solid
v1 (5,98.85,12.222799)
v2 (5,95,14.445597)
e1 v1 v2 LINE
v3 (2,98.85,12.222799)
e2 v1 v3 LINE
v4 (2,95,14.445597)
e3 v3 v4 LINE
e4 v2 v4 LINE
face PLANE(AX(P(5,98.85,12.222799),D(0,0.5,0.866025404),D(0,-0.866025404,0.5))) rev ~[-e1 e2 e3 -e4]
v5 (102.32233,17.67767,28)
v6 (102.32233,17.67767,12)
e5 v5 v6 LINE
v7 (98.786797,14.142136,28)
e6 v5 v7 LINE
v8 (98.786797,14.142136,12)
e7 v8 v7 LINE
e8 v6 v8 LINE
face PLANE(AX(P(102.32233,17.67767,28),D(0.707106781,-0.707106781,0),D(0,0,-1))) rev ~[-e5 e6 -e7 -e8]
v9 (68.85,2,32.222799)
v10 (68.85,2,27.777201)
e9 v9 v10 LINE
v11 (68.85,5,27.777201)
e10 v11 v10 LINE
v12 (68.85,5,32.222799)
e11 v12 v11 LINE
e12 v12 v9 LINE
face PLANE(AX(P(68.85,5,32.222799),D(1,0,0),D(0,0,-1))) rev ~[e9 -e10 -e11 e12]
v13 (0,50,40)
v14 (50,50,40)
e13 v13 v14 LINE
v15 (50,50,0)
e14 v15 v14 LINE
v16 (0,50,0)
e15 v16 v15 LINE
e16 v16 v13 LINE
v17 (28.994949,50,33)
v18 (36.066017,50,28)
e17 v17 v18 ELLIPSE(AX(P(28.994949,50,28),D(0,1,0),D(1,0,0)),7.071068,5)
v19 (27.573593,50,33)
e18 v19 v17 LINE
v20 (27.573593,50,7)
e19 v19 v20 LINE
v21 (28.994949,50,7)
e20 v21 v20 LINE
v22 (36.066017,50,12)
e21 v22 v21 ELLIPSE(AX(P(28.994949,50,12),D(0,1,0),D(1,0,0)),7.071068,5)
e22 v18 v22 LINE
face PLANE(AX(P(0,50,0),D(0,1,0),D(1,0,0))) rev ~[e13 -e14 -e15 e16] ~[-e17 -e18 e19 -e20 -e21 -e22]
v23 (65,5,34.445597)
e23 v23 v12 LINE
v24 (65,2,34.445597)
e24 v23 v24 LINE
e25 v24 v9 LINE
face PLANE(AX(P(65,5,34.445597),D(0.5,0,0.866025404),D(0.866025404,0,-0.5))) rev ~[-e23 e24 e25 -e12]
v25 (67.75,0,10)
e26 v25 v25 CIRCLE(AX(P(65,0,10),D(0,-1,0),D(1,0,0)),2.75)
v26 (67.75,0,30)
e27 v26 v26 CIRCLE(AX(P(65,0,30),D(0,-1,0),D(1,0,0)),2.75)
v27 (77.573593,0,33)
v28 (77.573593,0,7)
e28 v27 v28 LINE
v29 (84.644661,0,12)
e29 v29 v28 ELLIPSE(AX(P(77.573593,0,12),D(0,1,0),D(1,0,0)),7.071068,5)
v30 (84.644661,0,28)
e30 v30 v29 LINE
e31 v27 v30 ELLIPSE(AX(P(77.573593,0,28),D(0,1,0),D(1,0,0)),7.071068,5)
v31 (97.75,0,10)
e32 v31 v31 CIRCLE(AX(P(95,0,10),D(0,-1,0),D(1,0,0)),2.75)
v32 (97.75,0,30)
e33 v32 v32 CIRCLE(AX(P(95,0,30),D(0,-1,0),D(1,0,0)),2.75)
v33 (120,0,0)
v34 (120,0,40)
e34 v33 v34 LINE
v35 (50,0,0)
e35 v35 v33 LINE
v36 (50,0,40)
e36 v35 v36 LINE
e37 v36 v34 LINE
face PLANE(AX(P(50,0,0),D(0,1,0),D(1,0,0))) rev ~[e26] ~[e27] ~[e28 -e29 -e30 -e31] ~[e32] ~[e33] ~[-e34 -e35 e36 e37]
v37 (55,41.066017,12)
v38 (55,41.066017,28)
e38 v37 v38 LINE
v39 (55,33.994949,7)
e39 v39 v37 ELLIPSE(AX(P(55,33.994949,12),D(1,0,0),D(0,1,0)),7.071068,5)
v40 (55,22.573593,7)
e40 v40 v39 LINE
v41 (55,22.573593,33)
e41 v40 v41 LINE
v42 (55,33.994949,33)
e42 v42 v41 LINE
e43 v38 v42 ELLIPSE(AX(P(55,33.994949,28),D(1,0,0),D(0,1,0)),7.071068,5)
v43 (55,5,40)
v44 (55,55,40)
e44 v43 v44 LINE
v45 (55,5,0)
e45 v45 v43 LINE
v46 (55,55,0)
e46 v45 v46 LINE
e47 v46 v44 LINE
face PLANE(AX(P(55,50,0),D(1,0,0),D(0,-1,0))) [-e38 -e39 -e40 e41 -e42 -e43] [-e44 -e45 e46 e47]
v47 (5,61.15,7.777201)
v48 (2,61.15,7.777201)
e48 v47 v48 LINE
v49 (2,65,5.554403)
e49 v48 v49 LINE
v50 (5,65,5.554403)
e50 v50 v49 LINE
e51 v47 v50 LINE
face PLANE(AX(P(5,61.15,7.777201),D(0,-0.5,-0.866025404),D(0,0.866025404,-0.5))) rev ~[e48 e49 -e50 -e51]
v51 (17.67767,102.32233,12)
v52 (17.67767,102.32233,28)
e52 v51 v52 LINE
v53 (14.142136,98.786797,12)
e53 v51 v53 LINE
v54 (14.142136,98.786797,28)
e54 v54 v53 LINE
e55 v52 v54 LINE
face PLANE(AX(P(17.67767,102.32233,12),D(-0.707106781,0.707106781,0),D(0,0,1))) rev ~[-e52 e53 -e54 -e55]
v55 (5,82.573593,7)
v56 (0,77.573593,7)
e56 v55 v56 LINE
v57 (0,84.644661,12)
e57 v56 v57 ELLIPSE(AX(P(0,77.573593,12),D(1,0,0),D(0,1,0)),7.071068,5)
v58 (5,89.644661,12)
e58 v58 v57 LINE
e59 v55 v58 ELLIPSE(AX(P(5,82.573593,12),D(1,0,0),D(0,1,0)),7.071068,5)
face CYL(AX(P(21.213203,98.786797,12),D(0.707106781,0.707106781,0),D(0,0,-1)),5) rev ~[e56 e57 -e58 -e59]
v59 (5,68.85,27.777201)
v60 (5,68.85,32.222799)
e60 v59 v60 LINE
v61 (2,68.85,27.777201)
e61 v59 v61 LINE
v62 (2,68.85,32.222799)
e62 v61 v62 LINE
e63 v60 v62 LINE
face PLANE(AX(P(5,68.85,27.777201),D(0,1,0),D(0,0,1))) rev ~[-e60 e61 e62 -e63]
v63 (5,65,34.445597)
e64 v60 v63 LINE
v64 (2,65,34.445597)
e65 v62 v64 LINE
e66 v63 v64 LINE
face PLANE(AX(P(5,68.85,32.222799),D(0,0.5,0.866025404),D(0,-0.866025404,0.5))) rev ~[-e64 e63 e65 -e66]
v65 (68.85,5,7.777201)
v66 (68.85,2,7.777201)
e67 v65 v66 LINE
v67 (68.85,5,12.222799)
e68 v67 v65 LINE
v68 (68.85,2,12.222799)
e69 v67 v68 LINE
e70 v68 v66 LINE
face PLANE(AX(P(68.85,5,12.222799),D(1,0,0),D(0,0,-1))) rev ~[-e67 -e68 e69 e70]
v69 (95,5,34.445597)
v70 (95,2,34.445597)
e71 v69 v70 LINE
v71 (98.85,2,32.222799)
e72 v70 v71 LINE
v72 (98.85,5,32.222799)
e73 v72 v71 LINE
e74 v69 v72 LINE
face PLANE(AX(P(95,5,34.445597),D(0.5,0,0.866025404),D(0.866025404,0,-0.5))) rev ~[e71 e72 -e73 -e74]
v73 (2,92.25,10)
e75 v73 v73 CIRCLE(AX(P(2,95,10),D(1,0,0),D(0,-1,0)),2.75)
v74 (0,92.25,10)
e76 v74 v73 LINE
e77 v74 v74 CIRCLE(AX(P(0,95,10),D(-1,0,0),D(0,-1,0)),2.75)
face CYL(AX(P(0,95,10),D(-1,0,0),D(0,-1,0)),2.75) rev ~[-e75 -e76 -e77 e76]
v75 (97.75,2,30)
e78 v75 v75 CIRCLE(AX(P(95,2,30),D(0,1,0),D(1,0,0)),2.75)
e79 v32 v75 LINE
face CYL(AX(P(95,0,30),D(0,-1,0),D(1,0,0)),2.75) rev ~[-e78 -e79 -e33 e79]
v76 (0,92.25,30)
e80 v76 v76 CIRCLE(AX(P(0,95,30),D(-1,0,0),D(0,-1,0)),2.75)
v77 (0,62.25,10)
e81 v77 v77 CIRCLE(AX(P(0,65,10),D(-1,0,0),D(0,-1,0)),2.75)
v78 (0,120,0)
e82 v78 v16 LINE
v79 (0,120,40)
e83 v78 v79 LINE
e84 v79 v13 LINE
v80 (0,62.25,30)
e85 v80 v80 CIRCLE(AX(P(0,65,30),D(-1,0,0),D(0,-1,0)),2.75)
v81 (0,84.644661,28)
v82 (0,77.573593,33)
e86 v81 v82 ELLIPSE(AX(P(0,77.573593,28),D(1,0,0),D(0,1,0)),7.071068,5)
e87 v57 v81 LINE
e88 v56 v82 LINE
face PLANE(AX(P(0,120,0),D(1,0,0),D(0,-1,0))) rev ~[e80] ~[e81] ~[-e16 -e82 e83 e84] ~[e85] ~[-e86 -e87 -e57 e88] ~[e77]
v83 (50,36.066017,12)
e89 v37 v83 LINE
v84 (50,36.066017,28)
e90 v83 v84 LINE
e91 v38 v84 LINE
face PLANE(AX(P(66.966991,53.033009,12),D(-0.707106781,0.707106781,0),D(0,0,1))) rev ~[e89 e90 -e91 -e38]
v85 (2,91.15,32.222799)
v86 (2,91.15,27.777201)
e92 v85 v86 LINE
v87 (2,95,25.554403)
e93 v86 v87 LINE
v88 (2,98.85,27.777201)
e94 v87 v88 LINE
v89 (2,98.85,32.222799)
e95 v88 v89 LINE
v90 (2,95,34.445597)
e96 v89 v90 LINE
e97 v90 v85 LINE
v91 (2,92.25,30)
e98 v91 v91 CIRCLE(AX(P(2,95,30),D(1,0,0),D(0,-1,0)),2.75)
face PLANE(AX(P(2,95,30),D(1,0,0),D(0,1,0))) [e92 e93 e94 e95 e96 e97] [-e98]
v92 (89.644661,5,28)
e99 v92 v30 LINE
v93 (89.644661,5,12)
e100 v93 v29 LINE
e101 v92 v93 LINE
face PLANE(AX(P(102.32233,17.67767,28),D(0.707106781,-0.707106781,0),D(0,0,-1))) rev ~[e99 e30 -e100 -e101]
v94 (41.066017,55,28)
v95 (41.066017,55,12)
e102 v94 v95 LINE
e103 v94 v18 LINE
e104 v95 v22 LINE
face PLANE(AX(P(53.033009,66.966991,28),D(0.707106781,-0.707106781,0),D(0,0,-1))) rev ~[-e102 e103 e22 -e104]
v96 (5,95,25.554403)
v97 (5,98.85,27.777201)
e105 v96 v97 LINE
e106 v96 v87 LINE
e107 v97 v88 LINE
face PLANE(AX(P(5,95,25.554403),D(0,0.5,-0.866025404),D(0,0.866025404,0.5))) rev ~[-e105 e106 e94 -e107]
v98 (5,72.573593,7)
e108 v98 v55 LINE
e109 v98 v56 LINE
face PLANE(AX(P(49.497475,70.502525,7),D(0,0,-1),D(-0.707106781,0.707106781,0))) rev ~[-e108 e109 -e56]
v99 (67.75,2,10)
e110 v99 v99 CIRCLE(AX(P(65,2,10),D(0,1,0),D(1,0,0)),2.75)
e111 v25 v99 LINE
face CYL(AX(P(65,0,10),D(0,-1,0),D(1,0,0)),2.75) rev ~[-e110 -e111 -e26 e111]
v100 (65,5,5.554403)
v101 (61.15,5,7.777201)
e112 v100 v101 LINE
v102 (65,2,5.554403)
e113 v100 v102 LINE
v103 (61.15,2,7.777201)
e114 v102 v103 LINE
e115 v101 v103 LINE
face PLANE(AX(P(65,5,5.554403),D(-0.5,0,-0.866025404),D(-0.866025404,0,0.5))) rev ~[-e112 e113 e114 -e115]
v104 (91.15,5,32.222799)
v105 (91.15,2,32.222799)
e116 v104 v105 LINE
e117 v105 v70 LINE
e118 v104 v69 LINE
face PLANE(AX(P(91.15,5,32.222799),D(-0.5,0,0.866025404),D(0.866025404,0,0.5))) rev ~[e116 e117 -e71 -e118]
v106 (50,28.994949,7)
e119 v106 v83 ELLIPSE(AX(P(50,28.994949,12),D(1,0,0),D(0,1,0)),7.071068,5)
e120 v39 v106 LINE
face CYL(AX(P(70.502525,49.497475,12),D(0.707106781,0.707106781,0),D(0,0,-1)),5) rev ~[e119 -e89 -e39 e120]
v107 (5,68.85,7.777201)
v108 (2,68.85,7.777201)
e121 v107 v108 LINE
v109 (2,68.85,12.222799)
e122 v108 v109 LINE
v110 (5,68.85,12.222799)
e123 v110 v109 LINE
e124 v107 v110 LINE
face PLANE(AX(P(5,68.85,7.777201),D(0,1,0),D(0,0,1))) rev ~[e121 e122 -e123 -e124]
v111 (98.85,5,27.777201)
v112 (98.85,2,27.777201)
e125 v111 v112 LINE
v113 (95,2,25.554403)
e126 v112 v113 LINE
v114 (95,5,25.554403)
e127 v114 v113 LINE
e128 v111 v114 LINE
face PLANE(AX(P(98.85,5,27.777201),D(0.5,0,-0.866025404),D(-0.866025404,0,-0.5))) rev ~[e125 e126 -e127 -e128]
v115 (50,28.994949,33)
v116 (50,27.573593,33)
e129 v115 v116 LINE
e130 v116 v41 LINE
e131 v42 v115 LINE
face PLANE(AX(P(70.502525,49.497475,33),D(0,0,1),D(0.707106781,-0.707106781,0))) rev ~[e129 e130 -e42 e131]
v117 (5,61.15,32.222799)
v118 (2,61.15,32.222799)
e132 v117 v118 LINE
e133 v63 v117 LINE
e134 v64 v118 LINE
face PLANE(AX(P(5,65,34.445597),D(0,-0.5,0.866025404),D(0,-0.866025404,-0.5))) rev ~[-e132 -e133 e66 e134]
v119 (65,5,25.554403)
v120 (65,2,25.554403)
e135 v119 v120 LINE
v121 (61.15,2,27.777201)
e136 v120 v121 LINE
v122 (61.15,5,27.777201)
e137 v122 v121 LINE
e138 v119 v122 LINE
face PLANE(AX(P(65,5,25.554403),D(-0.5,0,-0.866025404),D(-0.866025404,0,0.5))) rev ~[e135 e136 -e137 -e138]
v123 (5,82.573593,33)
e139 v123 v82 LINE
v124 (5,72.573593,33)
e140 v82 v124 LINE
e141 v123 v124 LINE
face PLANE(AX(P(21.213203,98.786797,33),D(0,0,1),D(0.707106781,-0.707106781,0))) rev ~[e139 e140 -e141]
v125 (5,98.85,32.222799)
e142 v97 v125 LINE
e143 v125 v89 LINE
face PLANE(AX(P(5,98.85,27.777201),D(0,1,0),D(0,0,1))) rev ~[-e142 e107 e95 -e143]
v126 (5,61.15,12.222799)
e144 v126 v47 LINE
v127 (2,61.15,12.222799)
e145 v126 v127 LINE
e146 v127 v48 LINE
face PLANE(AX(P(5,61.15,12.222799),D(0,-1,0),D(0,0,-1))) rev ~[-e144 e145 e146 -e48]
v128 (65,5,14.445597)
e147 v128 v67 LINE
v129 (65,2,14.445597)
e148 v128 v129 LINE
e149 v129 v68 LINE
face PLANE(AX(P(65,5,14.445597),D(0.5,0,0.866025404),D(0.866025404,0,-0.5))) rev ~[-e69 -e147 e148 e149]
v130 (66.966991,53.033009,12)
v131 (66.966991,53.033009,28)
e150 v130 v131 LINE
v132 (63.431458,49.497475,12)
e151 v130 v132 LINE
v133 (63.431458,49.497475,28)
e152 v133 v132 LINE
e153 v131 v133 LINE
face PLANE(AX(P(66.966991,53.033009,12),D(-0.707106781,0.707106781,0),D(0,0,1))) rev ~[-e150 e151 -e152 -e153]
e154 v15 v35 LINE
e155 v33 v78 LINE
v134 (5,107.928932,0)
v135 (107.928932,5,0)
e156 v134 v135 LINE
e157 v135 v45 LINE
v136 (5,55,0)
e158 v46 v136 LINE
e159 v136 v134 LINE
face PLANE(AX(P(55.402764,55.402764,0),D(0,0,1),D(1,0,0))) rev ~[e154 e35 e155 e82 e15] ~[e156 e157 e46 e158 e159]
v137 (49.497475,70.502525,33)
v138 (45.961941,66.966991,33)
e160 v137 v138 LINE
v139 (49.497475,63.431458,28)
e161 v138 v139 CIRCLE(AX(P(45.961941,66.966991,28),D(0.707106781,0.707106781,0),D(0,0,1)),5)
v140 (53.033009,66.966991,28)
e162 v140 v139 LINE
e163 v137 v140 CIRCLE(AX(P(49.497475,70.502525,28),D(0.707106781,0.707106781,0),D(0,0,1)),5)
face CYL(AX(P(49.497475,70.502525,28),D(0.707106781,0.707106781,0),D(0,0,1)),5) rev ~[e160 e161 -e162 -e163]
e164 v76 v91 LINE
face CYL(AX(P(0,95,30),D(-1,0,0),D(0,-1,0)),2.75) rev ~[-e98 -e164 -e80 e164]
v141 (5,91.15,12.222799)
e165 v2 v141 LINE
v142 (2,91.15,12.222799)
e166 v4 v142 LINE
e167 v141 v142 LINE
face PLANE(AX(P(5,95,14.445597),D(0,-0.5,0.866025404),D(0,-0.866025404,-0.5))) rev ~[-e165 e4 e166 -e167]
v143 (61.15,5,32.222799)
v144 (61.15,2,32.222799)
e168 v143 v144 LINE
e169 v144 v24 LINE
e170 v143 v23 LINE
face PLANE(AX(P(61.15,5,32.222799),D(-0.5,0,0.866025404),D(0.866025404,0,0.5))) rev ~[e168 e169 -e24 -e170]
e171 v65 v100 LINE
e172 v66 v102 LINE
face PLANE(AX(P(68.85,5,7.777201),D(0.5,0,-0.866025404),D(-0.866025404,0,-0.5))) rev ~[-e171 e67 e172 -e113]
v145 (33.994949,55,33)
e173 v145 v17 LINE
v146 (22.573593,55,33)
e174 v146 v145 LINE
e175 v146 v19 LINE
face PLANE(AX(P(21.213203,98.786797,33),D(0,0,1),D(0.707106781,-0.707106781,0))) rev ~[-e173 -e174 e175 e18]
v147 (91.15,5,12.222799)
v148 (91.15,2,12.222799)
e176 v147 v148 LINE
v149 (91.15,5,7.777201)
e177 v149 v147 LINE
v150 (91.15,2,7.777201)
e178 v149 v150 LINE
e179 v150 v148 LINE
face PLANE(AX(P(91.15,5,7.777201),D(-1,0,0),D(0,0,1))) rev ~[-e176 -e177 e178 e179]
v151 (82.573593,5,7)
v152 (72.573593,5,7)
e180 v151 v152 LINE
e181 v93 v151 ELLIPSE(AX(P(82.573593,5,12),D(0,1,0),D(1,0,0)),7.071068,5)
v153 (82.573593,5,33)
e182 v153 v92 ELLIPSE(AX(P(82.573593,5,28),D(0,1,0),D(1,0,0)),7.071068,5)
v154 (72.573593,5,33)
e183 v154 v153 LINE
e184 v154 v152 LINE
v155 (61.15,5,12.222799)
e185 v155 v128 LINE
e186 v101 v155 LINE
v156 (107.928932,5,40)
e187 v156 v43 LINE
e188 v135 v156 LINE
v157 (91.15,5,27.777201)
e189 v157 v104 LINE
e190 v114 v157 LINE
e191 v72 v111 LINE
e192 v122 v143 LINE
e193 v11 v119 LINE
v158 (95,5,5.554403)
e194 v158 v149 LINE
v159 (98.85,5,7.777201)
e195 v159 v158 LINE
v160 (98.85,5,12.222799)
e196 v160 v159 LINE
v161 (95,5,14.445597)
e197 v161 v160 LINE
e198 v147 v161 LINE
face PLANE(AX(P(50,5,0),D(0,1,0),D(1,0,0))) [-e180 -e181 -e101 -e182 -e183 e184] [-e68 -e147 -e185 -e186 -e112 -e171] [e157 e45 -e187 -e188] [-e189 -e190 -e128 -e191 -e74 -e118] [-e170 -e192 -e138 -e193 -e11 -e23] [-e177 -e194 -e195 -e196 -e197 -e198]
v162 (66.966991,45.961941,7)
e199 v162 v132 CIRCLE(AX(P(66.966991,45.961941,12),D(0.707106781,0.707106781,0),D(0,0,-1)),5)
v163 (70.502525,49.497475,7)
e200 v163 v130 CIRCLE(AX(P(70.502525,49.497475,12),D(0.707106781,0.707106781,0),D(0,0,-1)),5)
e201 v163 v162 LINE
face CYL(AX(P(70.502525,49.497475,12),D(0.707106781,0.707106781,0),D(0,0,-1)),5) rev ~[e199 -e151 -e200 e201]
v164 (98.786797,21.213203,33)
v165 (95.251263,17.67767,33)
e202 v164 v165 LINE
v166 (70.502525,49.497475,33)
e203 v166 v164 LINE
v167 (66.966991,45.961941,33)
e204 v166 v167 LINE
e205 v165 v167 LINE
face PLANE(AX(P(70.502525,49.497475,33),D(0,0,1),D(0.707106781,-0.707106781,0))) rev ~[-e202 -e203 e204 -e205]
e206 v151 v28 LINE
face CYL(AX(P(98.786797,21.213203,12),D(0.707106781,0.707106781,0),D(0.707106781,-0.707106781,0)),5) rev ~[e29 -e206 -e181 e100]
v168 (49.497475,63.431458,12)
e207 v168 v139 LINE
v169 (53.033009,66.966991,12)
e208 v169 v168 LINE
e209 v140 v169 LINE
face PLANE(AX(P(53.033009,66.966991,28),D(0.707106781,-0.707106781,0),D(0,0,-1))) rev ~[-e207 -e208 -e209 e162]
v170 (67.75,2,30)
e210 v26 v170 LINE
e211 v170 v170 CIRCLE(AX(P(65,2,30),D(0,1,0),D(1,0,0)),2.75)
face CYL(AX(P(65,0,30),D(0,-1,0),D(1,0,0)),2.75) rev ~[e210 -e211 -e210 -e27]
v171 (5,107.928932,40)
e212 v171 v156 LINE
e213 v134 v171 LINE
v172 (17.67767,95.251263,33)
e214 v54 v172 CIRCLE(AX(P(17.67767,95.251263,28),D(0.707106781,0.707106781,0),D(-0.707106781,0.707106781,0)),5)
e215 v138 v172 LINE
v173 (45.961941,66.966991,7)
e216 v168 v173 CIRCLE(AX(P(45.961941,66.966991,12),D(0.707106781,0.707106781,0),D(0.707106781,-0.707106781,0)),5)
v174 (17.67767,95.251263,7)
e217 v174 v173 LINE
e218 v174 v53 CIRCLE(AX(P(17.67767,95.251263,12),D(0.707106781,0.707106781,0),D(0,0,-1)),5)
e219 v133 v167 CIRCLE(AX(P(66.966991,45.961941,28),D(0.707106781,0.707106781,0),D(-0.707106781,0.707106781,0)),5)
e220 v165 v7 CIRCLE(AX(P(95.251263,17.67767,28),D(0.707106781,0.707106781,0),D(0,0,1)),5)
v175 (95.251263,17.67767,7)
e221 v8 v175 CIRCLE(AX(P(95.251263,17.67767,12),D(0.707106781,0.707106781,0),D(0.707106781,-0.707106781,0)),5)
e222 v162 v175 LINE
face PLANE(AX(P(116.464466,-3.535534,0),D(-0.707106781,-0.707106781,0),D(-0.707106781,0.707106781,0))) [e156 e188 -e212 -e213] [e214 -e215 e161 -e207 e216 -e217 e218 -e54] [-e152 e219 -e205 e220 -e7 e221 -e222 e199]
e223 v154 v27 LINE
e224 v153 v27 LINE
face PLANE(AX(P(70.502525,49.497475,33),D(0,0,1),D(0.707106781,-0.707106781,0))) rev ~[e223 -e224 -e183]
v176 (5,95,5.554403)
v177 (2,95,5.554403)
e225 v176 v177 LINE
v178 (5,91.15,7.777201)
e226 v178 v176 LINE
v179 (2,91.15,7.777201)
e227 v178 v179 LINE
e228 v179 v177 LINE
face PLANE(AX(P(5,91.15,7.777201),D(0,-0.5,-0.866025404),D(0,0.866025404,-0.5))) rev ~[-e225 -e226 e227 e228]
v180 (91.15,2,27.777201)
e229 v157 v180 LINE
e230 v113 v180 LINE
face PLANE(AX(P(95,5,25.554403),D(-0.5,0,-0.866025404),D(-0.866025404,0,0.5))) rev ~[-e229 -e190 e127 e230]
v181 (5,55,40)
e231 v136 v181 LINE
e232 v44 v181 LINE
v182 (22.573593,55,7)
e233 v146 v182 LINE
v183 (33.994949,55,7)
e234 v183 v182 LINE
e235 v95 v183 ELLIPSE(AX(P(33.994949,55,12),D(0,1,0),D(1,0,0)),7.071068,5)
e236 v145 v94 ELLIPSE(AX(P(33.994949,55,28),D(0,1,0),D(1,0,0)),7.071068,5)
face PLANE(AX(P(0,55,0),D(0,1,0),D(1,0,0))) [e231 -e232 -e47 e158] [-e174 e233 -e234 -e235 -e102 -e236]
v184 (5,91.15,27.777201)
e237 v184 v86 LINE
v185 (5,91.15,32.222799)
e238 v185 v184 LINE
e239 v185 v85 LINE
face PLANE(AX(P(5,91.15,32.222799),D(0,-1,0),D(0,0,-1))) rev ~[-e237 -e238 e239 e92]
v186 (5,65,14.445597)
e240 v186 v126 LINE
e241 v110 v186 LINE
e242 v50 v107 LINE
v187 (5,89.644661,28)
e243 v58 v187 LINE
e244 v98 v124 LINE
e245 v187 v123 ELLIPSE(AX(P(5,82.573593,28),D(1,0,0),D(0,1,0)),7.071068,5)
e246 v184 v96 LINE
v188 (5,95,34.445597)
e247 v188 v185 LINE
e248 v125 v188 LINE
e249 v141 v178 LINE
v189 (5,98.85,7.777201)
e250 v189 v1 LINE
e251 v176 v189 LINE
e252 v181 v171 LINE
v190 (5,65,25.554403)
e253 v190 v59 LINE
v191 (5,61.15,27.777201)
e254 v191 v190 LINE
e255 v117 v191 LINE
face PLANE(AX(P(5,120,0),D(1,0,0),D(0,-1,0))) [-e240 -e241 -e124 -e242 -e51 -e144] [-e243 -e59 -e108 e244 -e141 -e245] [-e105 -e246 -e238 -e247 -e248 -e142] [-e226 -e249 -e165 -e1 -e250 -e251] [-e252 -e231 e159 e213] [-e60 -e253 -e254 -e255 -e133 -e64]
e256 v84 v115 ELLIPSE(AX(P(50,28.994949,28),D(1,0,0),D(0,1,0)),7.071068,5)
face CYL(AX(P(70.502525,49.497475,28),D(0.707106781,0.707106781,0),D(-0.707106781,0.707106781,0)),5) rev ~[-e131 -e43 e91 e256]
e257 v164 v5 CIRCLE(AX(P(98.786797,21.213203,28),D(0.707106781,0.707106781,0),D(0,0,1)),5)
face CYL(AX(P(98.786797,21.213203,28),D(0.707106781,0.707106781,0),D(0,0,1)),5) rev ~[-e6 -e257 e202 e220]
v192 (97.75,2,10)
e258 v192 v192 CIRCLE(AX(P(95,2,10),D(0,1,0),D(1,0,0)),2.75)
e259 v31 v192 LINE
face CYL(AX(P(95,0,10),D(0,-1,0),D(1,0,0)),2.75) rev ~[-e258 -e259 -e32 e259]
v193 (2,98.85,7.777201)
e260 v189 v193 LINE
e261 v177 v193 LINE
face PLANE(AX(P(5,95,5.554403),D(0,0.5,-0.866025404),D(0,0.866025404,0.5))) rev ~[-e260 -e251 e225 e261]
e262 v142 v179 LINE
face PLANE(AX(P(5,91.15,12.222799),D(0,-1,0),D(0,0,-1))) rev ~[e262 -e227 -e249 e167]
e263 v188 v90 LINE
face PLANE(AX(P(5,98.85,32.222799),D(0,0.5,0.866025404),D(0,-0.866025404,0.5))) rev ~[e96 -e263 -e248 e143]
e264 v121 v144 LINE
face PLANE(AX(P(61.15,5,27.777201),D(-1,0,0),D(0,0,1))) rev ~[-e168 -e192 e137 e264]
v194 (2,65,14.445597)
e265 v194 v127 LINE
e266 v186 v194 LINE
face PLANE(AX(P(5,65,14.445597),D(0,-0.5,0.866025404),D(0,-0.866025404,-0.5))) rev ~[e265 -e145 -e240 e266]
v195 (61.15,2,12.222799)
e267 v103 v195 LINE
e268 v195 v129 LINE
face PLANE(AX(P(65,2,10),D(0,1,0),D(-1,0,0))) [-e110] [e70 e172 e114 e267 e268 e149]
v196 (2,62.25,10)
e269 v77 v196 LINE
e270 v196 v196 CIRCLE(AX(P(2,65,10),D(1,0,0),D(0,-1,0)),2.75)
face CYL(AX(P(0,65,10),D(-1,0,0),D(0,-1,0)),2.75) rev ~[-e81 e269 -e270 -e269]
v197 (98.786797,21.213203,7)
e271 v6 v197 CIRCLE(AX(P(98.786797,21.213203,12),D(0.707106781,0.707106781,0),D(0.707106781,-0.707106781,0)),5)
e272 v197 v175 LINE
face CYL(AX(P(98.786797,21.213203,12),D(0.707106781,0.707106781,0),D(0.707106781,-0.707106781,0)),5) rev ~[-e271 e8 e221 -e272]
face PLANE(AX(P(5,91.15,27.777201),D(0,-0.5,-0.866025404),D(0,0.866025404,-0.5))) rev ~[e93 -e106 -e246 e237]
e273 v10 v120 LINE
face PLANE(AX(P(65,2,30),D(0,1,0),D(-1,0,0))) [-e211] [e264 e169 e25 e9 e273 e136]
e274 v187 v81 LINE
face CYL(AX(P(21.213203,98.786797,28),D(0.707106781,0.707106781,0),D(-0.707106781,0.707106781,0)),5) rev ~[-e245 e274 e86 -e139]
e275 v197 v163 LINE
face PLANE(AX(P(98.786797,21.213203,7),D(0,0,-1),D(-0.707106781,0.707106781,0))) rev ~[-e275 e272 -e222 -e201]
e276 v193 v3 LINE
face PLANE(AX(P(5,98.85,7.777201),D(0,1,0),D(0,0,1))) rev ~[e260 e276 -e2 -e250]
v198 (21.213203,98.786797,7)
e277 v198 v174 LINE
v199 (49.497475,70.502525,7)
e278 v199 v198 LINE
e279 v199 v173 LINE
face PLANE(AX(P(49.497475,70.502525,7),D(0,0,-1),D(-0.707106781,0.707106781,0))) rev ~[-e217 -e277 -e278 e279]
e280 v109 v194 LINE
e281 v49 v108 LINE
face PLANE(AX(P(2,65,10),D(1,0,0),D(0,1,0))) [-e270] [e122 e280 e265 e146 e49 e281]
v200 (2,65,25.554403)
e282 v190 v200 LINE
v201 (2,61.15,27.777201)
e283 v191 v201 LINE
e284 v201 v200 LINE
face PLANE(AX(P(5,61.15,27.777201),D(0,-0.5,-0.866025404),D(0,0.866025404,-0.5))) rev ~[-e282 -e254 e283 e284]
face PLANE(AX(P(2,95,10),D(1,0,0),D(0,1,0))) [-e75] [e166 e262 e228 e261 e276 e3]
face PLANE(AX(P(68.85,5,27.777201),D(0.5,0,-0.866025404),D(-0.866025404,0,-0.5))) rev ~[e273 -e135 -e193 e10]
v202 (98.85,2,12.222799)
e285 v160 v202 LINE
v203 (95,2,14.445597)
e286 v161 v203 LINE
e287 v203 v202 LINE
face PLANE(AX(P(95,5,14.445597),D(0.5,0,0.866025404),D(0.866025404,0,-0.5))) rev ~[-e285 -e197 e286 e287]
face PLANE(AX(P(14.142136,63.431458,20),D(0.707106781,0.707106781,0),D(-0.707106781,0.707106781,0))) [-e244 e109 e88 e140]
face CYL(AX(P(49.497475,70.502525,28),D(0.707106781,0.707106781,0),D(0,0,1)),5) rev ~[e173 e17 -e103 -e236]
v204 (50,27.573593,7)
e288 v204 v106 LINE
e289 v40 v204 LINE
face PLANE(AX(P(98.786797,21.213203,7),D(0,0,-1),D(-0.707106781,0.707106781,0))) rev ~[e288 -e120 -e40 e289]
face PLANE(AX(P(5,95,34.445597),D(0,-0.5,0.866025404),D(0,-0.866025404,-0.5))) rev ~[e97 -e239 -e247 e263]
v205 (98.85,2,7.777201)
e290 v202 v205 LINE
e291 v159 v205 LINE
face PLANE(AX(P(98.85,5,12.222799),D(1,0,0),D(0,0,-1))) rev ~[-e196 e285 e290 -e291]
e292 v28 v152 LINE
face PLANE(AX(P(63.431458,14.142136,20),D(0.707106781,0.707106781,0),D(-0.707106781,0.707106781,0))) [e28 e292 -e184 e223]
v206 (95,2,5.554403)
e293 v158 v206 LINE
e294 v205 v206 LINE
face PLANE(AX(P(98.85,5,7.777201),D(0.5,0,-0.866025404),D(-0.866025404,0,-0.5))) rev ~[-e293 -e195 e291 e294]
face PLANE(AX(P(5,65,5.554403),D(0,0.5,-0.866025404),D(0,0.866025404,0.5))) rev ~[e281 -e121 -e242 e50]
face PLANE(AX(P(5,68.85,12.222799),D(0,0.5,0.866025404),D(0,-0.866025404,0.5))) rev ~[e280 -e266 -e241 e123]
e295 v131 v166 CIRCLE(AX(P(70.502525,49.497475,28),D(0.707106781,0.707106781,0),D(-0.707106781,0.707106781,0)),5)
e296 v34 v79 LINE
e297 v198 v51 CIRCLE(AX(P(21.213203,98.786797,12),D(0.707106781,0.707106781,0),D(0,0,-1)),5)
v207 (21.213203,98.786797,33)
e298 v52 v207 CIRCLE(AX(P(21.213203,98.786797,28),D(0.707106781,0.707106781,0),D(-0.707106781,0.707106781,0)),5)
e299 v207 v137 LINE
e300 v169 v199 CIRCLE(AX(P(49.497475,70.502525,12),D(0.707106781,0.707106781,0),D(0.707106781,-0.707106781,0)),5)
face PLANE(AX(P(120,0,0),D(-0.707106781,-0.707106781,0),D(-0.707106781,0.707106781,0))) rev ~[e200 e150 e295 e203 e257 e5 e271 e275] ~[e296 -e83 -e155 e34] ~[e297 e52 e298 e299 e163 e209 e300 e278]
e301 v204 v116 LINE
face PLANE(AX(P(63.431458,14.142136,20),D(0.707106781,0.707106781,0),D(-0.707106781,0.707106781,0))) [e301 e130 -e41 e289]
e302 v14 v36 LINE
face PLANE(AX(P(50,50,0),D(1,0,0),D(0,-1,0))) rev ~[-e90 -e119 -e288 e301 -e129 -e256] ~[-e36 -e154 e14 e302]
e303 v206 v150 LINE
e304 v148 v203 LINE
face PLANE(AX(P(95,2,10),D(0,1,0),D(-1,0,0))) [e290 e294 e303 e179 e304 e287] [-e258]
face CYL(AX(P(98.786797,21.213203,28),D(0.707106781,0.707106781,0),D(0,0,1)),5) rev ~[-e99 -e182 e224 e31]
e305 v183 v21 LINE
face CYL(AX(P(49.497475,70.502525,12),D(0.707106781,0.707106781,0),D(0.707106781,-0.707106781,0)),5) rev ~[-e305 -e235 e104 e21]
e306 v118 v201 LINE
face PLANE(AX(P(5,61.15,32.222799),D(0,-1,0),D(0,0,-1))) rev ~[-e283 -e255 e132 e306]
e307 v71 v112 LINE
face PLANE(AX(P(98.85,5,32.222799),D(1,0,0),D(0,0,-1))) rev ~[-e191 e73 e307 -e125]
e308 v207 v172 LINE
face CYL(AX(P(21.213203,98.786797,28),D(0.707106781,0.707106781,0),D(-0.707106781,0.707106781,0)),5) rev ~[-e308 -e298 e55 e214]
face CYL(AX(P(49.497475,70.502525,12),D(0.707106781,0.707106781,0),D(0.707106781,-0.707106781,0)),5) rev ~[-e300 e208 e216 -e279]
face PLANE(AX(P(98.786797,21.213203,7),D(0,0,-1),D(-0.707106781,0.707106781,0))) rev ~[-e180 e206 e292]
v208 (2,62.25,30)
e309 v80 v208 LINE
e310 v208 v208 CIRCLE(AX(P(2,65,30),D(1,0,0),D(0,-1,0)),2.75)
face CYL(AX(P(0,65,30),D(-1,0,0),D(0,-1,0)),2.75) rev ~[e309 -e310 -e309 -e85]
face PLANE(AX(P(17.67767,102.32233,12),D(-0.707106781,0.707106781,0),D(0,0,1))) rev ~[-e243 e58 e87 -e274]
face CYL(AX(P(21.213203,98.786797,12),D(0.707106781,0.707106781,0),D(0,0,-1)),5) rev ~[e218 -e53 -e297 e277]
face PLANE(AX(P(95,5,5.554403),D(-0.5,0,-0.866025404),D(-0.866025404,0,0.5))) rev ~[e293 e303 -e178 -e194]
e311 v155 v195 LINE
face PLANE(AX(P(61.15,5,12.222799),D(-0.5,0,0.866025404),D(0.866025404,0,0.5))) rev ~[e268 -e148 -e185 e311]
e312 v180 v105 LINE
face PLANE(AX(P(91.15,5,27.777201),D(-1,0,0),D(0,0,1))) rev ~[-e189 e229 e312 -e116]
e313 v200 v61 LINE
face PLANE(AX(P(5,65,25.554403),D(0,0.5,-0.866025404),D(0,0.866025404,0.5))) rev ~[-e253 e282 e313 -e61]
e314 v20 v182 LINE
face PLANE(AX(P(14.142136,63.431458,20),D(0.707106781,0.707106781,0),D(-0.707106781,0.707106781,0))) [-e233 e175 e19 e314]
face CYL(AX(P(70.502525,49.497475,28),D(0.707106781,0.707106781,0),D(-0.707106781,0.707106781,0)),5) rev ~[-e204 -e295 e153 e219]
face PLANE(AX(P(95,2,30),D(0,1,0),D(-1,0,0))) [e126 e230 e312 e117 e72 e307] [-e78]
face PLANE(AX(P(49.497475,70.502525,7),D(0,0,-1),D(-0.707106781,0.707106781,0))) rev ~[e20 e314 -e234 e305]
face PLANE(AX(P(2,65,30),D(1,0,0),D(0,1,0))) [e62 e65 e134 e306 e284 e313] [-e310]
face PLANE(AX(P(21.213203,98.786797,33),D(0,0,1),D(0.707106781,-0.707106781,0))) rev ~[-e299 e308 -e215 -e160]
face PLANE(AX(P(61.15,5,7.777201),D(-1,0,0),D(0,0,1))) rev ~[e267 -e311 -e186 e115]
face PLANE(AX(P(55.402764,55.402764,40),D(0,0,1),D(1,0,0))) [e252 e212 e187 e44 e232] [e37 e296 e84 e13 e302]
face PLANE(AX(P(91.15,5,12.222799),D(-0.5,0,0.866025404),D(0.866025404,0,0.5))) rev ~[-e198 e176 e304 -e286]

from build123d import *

# Parameters (mm, degrees)
F1_DEPTH  = 40
F2_T      = -5
F4_DEPTH  = 30
F5_R      = 2.75
F6_DEPTH  = 5
F7_R      = 2.75
F8_DEPTH  = 5
F9_R      = 2.75
F10_DEPTH = 3
F11_R     = 2.75
F12_DEPTH = 3


# Not quite as in the source:
# - a feature names something its author has since deleted; it is built from what else it names


with BuildPart() as f1:
    # F0 (on Top) → F1 (new body)
    with BuildSketch(Plane.XY):
        Polygon((120, 0), (0, 120), (0, 100), (50, 50), (100, 0), align=None)
        Polygon((50, 50), (0, 100), (0, 92.9289321881), (42.9289321881, 50), align=None)
        Polygon((42.9289321881, 50), (0, 92.9289321881), (0, 50), align=None)
        Polygon((92.9289321881, 0), (50, 42.9289321881), (50, 0), align=None)
        Polygon((100, 0), (50, 50), (50, 42.9289321881), (92.9289321881, 0), align=None)
    extrude(amount=F1_DEPTH)

    # F2
    f2_openings = [f1.faces().sort_by_distance(p)[0] for p in [
        (51.697056, 25, 40),
        (51.697056, 25, 0),
    ]]
    offset(amount=F2_T, openings=f2_openings, kind=Kind.INTERSECTION)

    # F3 (on face) → F4 (cut)
    with BuildSketch(Plane(origin=(60, 60, 0), x_dir=(-0.7071067812, 0.7071067812, 0), z_dir=(0.7071067812, 0.7071067812, 0))):
        with BuildLine():
            ThreePointArc((59.8528137424, 28), (58.3883476483, 31.5355339059), (54.8528137424, 33))
            Line((54.8528137424, 33), (14.8528137424, 33))
            ThreePointArc((14.8528137424, 33), (11.3172798365, 31.5355339059), (9.8528137424, 28))
            Line((9.8528137424, 28), (9.8528137424, 12))
            ThreePointArc((9.8528137424, 12), (11.3172798365, 8.4644660941), (14.8528137424, 7))
            Line((14.8528137424, 7), (54.8528137424, 7))
            ThreePointArc((54.8528137424, 7), (58.3883476483, 8.4644660941), (59.8528137424, 12))
            Line((59.8528137424, 12), (59.8528137424, 28))
        make_face()
        with BuildLine():
            ThreePointArc((-54.8528137424, 33), (-58.3883476483, 31.5355339059), (-59.8528137424, 28))
            Line((-59.8528137424, 28), (-59.8528137424, 12))
            ThreePointArc((-59.8528137424, 12), (-58.3883476483, 8.4644660941), (-54.8528137424, 7))
            Line((-54.8528137424, 7), (-14.8528137424, 7))
            ThreePointArc((-14.8528137424, 7), (-11.3172798365, 8.4644660941), (-9.8528137424, 12))
            Line((-9.8528137424, 12), (-9.8528137424, 28))
            ThreePointArc((-9.8528137424, 28), (-11.3172798365, 31.5355339059), (-14.8528137424, 33))
            Line((-14.8528137424, 33), (-54.8528137424, 33))
        make_face()
    extrude(amount=-F4_DEPTH, mode=Mode.SUBTRACT)

    # F5 (on face) → F6 (cut, through all)
    with BuildSketch(Plane(origin=(0, 0, 0), x_dir=(0, -1, 0), z_dir=(-1, 0, 0))):
        with Locations((-95, 10)):
            Circle(F5_R)
        with Locations((-95, 30)):
            Circle(F5_R)
        with Locations((-65, 10)):
            Circle(F5_R)
        with Locations((-65, 30)):
            Circle(F5_R)
    extrude(amount=-F6_DEPTH, mode=Mode.SUBTRACT)

    # F7 (on face) → F8 (cut, through all)
    with BuildSketch(Plane.XZ):
        with Locations((65, 30)):
            Circle(F7_R)
        with Locations((95, 30)):
            Circle(F7_R)
        with Locations((95, 10)):
            Circle(F7_R)
        with Locations((65, 10)):
            Circle(F7_R)
    extrude(amount=-F8_DEPTH, mode=Mode.SUBTRACT)

    # F9 (on face) → F10 (cut)
    with BuildSketch(Plane.YZ.offset(5)):
        Polygon((61.15, 27.7772014636), (65, 25.5544029272), (68.85, 27.7772014636), (68.85, 32.2227985364), (65, 34.4455970728), (61.15, 32.2227985364), align=None)
        with Locations((65, 30)):
            Circle(F9_R, mode=Mode.SUBTRACT)
        Polygon((61.15, 12.2227985364), (61.15, 7.7772014636), (65, 5.5544029272), (68.85, 7.7772014636), (68.85, 12.2227985364), (65, 14.4455970728), align=None)
        with Locations((65, 10)):
            Circle(F9_R, mode=Mode.SUBTRACT)
        Polygon((91.15, 7.7772014636), (95, 5.5544029272), (98.85, 7.7772014636), (98.85, 12.2227985364), (95, 14.4455970728), (91.15, 12.2227985364), align=None)
        with Locations((95, 10)):
            Circle(F9_R, mode=Mode.SUBTRACT)
        Polygon((91.15, 27.7772014636), (95, 25.5544029272), (98.85, 27.7772014636), (98.85, 32.2227985364), (95, 34.4455970728), (91.15, 32.2227985364), align=None)
        with Locations((95, 30)):
            Circle(F9_R, mode=Mode.SUBTRACT)
    extrude(amount=-F10_DEPTH, mode=Mode.SUBTRACT)

    # F11 (on face) → F12 (cut)
    with BuildSketch(Plane(origin=(0, 5, 0), x_dir=(-1, 0, 0), z_dir=(0, 1, 0))):
        Polygon((-91.15, 12.2227985364), (-95, 14.4455970728), (-98.85, 12.2227985364), (-98.85, 7.7772014636), (-95, 5.5544029272), (-91.15, 7.7772014636), align=None)
        with Locations((-95, 10)):
            Circle(F11_R, mode=Mode.SUBTRACT)
        Polygon((-91.15, 32.2227985364), (-95, 34.4455970728), (-98.85, 32.2227985364), (-98.85, 27.7772014636), (-95, 25.5544029272), (-91.15, 27.7772014636), align=None)
        with Locations((-95, 30)):
            Circle(F11_R, mode=Mode.SUBTRACT)
        Polygon((-61.15, 32.2227985364), (-65, 34.4455970728), (-68.85, 32.2227985364), (-68.85, 27.7772014636), (-65, 25.5544029272), (-61.15, 27.7772014636), align=None)
        with Locations((-65, 30)):
            Circle(F11_R, mode=Mode.SUBTRACT)
        Polygon((-61.15, 12.2227985364), (-65, 14.4455970728), (-68.85, 12.2227985364), (-68.85, 7.7772014636), (-65, 5.5544029272), (-61.15, 7.7772014636), align=None)
        with Locations((-65, 10)):
            Circle(F11_R, mode=Mode.SUBTRACT)
    extrude(amount=-F12_DEPTH, mode=Mode.SUBTRACT)


solid = f1.part
